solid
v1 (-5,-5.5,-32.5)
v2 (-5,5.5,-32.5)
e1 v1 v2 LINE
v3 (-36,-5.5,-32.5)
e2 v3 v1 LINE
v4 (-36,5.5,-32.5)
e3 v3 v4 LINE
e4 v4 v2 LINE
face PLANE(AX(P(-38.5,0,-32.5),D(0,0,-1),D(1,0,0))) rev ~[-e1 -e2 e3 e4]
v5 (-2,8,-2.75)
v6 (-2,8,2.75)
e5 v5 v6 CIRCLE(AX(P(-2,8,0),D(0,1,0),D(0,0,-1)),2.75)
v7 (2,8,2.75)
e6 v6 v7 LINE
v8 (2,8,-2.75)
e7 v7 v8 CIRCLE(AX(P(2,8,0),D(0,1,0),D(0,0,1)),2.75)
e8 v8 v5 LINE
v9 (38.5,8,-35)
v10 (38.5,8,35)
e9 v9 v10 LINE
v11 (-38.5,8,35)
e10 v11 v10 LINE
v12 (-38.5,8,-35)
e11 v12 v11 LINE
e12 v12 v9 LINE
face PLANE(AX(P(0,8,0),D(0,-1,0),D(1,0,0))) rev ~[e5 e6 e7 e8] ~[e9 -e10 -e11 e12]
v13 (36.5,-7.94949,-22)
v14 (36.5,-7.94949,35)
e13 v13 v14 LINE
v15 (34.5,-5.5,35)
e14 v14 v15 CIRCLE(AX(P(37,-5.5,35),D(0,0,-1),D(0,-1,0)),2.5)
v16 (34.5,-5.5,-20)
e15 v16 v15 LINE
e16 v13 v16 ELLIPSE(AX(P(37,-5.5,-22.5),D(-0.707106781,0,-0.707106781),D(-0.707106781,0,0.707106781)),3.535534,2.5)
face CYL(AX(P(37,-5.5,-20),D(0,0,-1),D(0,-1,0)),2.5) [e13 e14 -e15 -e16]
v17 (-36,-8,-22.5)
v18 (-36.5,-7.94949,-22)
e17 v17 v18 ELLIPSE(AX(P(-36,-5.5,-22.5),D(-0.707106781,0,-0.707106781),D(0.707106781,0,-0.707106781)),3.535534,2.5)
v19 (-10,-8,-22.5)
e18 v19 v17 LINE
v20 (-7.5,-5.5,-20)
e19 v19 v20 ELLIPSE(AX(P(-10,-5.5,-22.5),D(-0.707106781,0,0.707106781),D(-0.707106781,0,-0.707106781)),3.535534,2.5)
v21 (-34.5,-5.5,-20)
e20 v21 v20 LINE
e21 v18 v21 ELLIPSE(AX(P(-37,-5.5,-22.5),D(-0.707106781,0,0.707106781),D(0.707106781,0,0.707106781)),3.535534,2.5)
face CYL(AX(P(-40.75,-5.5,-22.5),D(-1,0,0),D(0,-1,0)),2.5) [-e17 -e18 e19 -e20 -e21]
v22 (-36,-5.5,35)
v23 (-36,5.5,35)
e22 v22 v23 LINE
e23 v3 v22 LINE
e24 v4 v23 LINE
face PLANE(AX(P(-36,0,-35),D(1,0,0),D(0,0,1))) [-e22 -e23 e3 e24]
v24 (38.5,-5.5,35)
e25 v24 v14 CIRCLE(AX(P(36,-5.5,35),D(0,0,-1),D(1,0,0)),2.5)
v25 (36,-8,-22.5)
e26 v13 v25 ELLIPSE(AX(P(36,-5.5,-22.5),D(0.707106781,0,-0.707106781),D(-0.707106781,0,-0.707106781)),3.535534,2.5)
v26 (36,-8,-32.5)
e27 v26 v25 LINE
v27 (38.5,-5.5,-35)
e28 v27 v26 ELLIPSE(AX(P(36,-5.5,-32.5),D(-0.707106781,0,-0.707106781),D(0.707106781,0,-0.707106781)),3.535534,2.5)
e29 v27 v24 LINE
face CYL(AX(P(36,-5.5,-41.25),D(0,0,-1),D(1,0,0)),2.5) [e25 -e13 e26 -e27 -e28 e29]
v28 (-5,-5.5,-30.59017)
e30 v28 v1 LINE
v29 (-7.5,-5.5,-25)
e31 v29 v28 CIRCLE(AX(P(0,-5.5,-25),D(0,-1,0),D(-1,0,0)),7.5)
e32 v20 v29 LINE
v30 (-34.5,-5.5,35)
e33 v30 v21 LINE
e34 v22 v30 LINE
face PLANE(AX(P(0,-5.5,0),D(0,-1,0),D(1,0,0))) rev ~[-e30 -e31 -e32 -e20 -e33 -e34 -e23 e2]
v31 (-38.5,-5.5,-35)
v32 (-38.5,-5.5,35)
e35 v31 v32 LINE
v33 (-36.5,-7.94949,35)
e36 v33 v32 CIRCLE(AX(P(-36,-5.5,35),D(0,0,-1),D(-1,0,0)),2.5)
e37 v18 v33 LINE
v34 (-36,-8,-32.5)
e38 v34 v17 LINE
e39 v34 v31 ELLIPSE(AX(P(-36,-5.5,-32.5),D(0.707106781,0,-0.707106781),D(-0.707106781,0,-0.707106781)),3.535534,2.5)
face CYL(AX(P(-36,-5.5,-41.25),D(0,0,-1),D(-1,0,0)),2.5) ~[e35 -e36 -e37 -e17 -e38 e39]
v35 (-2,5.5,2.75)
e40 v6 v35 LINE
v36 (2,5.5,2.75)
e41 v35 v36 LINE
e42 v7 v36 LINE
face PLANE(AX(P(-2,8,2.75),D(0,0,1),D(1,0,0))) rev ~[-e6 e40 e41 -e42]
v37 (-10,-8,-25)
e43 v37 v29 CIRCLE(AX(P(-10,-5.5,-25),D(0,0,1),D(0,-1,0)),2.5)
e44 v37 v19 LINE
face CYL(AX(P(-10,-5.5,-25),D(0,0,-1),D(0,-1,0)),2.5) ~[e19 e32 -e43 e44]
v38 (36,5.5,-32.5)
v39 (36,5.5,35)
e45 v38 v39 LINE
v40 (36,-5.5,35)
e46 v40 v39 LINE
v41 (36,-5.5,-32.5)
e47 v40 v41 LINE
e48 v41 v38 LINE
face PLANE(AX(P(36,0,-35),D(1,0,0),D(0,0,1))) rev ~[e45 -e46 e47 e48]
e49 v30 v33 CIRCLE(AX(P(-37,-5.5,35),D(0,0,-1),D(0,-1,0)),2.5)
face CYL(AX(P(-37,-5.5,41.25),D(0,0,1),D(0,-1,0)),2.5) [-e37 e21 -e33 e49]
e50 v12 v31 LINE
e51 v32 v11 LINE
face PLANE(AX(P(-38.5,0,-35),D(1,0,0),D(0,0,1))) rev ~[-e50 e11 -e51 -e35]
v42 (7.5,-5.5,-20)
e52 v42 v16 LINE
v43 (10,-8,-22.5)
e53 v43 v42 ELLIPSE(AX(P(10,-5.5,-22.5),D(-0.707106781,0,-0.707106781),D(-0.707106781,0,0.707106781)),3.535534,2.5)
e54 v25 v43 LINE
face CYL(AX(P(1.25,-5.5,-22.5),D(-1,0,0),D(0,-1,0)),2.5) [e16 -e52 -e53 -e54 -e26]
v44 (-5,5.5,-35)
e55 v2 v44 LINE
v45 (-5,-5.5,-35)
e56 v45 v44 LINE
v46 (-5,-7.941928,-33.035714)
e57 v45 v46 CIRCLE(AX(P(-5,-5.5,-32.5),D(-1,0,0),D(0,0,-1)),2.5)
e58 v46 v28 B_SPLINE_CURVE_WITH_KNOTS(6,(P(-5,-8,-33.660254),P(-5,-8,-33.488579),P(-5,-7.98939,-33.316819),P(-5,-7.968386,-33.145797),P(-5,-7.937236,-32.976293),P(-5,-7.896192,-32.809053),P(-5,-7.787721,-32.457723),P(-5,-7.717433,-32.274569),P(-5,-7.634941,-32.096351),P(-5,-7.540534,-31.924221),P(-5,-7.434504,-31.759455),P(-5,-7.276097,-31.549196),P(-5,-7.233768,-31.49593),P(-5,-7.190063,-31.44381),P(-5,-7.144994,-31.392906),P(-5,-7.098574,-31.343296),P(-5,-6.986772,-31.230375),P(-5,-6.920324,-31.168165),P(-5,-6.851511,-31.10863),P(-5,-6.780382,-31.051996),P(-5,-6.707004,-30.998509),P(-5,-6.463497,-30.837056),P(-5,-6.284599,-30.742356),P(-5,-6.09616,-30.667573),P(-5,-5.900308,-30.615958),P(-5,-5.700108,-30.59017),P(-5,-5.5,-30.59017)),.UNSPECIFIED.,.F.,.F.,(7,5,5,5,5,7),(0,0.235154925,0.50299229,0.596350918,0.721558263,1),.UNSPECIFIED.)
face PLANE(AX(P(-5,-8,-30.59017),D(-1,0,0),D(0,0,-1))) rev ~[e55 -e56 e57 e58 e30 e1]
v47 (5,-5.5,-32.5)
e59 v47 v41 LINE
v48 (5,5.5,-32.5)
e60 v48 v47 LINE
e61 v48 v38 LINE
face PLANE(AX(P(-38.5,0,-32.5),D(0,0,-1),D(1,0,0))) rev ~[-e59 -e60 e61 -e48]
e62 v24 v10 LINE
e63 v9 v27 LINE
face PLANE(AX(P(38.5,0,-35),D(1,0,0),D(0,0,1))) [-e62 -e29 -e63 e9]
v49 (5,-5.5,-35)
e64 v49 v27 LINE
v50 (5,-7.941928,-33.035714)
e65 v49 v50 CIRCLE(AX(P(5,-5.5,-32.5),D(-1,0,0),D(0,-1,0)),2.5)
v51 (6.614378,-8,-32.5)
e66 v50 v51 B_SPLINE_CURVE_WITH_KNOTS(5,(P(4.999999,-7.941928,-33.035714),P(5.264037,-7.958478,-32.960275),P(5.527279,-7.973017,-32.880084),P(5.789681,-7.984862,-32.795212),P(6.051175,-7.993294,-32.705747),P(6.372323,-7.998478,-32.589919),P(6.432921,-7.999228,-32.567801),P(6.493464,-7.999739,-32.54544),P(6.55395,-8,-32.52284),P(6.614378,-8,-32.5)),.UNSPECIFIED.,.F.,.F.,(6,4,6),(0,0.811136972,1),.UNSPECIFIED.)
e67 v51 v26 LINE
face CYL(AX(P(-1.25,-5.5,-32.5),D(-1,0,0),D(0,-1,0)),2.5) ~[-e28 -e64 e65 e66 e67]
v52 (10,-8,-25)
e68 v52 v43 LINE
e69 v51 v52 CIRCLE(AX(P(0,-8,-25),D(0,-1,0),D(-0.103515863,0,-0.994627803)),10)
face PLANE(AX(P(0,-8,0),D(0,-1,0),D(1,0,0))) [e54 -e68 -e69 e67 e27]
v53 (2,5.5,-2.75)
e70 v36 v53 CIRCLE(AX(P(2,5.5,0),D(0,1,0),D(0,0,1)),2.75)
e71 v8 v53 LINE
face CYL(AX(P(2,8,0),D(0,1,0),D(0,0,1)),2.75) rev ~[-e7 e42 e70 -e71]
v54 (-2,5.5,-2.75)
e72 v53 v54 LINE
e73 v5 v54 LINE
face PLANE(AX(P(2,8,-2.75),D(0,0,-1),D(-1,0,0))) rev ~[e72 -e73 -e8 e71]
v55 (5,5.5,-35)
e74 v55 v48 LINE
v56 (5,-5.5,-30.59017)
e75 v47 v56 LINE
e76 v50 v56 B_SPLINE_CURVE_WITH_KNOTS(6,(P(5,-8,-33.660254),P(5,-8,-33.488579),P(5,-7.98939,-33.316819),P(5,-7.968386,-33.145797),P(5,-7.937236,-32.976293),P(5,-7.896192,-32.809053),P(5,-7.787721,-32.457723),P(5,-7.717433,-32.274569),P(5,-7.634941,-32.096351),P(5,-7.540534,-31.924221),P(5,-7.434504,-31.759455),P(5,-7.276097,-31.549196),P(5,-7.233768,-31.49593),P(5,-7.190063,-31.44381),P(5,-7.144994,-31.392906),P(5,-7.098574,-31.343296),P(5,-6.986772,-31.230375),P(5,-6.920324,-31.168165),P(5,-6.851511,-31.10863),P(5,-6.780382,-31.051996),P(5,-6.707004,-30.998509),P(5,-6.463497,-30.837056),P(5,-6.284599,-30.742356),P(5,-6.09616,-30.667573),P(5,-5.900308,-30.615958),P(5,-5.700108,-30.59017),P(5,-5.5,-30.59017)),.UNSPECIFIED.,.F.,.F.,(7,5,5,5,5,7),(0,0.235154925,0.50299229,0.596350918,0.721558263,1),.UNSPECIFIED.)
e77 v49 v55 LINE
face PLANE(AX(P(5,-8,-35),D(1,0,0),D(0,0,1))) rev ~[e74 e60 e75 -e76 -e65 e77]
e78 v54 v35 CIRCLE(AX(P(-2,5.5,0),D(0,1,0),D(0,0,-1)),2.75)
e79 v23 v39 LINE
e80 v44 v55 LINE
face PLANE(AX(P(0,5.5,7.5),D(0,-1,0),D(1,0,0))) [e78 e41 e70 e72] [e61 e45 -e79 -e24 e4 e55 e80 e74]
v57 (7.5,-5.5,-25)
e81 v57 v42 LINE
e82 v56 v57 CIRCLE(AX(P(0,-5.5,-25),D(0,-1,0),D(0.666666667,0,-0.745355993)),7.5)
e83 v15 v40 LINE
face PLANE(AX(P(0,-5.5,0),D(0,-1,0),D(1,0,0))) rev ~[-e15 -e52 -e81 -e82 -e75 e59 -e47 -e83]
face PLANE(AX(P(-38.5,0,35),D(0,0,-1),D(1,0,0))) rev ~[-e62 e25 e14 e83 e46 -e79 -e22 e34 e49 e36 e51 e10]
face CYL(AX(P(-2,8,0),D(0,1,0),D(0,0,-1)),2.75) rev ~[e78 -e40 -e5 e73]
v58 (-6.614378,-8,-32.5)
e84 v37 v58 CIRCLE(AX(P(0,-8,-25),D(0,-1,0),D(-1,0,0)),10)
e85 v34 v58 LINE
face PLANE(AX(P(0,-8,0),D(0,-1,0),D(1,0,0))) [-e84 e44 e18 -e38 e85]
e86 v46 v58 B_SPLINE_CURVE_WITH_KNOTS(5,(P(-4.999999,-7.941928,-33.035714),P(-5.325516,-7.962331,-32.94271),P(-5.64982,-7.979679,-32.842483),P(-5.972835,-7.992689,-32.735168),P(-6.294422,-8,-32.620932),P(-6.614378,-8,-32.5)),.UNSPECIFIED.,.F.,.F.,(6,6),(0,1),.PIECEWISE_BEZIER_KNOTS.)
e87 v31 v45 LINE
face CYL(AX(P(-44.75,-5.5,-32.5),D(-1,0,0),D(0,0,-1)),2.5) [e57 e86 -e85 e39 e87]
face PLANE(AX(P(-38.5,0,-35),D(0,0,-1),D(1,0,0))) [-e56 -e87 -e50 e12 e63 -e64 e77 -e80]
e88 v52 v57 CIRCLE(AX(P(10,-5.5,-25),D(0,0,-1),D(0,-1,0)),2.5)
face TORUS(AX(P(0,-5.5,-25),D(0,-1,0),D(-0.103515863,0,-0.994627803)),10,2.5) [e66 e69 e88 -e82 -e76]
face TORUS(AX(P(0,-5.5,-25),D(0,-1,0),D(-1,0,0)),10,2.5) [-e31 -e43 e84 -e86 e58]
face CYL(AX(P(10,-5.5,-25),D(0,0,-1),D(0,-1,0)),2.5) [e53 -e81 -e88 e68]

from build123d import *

# Parameters (mm, degrees)
F0_W         = 77
F0_H         = 70
F1_DEPTH     = 8
F2_T         = -2.5
F4_DEPTH     = 13.5
F6_DEPTH     = 2.5
F7_T1_DEPTH  = 82.5
F7_T3_DEPTH  = 46
F7_T5_DEPTH  = 46
F7_T7_DEPTH  = 33.25
F7_T9_DEPTH  = 33.25
F7_T11_DEPTH = 61.25
F7_T13_DEPTH = 11.25
F7_T16_ANGLE = 95.9416658211
F7_T18_ANGLE = 95.9416658211
F7_T23_DEPTH = 39.5
F7_T27_DEPTH = 67.5
F7_T34_DEPTH = 67.5
F7_T38_DEPTH = 39.5


# Not quite as in the source:
# - a fillet or chamfer that OpenCascade refuses, or shapes differently, is made with other operations: its cross-section is extruded or revolved along the edge and cut away or added


with BuildPart() as f1:
    # F0 (on Front) → F1 (new body, symmetric)
    with BuildSketch(Plane.XZ):
        Rectangle(F0_W, F0_H)
    extrude(amount=F1_DEPTH, both=True)

    # F2
    f2_openings = [f1.faces().sort_by_distance(p)[0] for p in [
        (0, 0, 35),
    ]]
    offset(amount=F2_T, openings=f2_openings)

    # F3 (on face) → F4 (cut, through all)
    with BuildSketch(Plane.XZ.offset(8)):
        Polygon((34.5, 35), (-34.5, 35), (-34.5, -20), (-7.5, -20), (7.5, -20), (34.5, -20), align=None)
        with BuildLine():
            Line((7.5, -20), (-7.5, -20))
            Line((-7.5, -20), (-7.5, -25))
            ThreePointArc((-7.5, -25), (-6.8465319688, -28.0618621785), (-5, -30.5901699437))
            ThreePointArc((-5, -30.5901699437), (0, -32.5), (5, -30.5901699437))
            ThreePointArc((5, -30.5901699437), (6.8465319688, -28.0618621785), (7.5, -25))
            Line((7.5, -25), (7.5, -20))
        make_face()
        with BuildLine():
            Line((-5, -30.5901699437), (-5, -35))
            Line((-5, -35), (5, -35))
            Line((5, -35), (5, -30.5901699437))
            ThreePointArc((5, -30.5901699437), (0, -32.5), (-5, -30.5901699437))
        make_face()
    extrude(amount=-F4_DEPTH, mode=Mode.SUBTRACT)

    # F5 (on face) → F6 (cut, through all)
    with BuildSketch(Plane(origin=(0, 8, 0), x_dir=(-1, 0, 0), z_dir=(0, 1, 0))):
        with BuildLine():
            ThreePointArc((2, -2.75), (4.75, 0), (2, 2.75))
            Line((2, 2.75), (-2, 2.75))
            ThreePointArc((-2, 2.75), (-4.75, 0), (-2, -2.75))
            Line((-2, -2.75), (2, -2.75))
        make_face()
    extrude(amount=-F6_DEPTH, mode=Mode.SUBTRACT)

    # F7: fillet of radius 2.5 on 10 edges, made by hand

    # F7_s2 → F7_t1 (cut)
    with BuildSketch(Plane.XY.offset(-41.25)):
        with BuildLine():
            ThreePointArc((38.5, -5.5), (37.767766953, -7.267766953), (36, -8))
            Line((36, -8), (38.5, -8))
            Line((38.5, -8), (38.5, -5.5))
        make_face()
        with BuildLine():
            ThreePointArc((-38.5, -5.5), (-37.767766953, -7.267766953), (-36, -8))
            Line((-36, -8), (-38.5, -8))
            Line((-38.5, -8), (-38.5, -5.5))
        make_face()
    extrude(amount=F7_T1_DEPTH, mode=Mode.SUBTRACT)

    # F7_s4 → F7_t3 (cut)
    with BuildSketch(Plane.YZ.offset(-44.75)):
        with BuildLine():
            ThreePointArc((-5.5, -35), (-7.267766953, -34.267766953), (-8, -32.5))
            Line((-8, -32.5), (-8, -35))
            Line((-8, -35), (-5.5, -35))
        make_face()
    extrude(amount=F7_T3_DEPTH, mode=Mode.SUBTRACT)

    # F7_s6 → F7_t5 (cut)
    with BuildSketch(Plane.YZ.offset(-1.25)):
        with BuildLine():
            ThreePointArc((-8, -32.5), (-7.267766953, -34.267766953), (-5.5, -35))
            Line((-5.5, -35), (-8, -35))
            Line((-8, -35), (-8, -32.5))
        make_face()
    extrude(amount=F7_T5_DEPTH, mode=Mode.SUBTRACT)

    # F7_s8 → F7_t7 (cut)
    with BuildSketch(Plane.YZ.offset(1.25)):
        with BuildLine():
            ThreePointArc((-8, -22.5), (-7.267766953, -20.732233047), (-5.5, -20))
            Line((-5.5, -20), (-8, -20))
            Line((-8, -20), (-8, -22.5))
        make_face()
    extrude(amount=F7_T7_DEPTH, mode=Mode.SUBTRACT)

    # F7_s10 → F7_t9 (cut)
    with BuildSketch(Plane.YZ.offset(-34.5)):
        with BuildLine():
            ThreePointArc((-8, -22.5), (-7.267766953, -20.732233047), (-5.5, -20))
            Line((-5.5, -20), (-8, -20))
            Line((-8, -20), (-8, -22.5))
        make_face()
    extrude(amount=F7_T9_DEPTH, mode=Mode.SUBTRACT)

    # F7_s12 → F7_t11 (cut)
    with BuildSketch(Plane.XY.offset(-20)):
        with BuildLine():
            ThreePointArc((37, -8), (35.232233047, -7.267766953), (34.5, -5.5))
            Line((34.5, -5.5), (34.5, -8))
            Line((34.5, -8), (37, -8))
        make_face()
        with BuildLine():
            ThreePointArc((-37, -8), (-35.232233047, -7.267766953), (-34.5, -5.5))
            Line((-34.5, -5.5), (-34.5, -8))
            Line((-34.5, -8), (-37, -8))
        make_face()
    extrude(amount=F7_T11_DEPTH, mode=Mode.SUBTRACT)

    # F7_s14 → F7_t13 (cut)
    with BuildSketch(Plane.XY.offset(-25)):
        with BuildLine():
            ThreePointArc((10, -8), (8.232233047, -7.267766953), (7.5, -5.5))
            Line((7.5, -5.5), (7.5, -8))
            Line((7.5, -8), (10, -8))
        make_face()
        with BuildLine():
            ThreePointArc((-10, -8), (-8.232233047, -7.267766953), (-7.5, -5.5))
            Line((-7.5, -5.5), (-7.5, -8))
            Line((-7.5, -8), (-10, -8))
        make_face()
    extrude(amount=F7_T13_DEPTH, mode=Mode.SUBTRACT)

    # F7_s15 → F7_t16 (revolve, cut)
    with BuildSketch(Plane.XY.offset(-25)):
        with BuildLine():
            ThreePointArc((-10, -8), (-8.232233047, -7.267766953), (-7.5, -5.5))
            Line((-7.5, -5.5), (-7.5, -8))
            Line((-7.5, -8), (-10, -8))
        make_face()
    revolve(axis=Axis((0, -8, -25), (0, -1, 0)), revolution_arc=F7_T16_ANGLE, mode=Mode.SUBTRACT)

    # F7_s17 → F7_t18 (revolve, cut)
    with BuildSketch(Plane(origin=(2.5739938884, 0, -0.2678883482), x_dir=(0, 1, 0), z_dir=(-0.9946278028, 0, 0.1035158632))):
        with BuildLine():
            ThreePointArc((-8, 34.8656950696), (-7.267766953, 33.0979281167), (-5.5, 32.3656950696))
            Line((-5.5, 32.3656950696), (-8, 32.3656950696))
            Line((-8, 32.3656950696), (-8, 34.8656950696))
        make_face()
    revolve(axis=Axis((0, -8, -25), (0, -1, 0)), revolution_arc=F7_T18_ANGLE, mode=Mode.SUBTRACT)


with BuildPart() as f7_tool21:
    # F7_s22 → F7_t23 (new body)
    with BuildSketch(Plane.YZ.offset(1.25)):
        with BuildLine():
            ThreePointArc((-8, -22.5), (-7.267766953, -20.732233047), (-5.5, -20))
            Line((-5.5, -20), (-8, -20))
            Line((-8, -20), (-8, -22.5))
        make_face()
    extrude(amount=F7_T23_DEPTH)

    split(bisect_by=Plane.YZ.offset(34.5), keep=Keep.TOP)


with BuildPart() as f7_tool25:
    # F7_s26 → F7_t27 (new body)
    with BuildSketch(Plane.XY.offset(-26.25)):
        with BuildLine():
            ThreePointArc((37, -8), (35.232233047, -7.267766953), (34.5, -5.5))
            Line((34.5, -5.5), (34.5, -8))
            Line((34.5, -8), (37, -8))
        make_face()
    extrude(amount=F7_T27_DEPTH)

    split(bisect_by=Plane.XY.offset(-20), keep=Keep.BOTTOM)


with BuildPart() as f7_tool21_1:
    add(f7_tool21.part)

    # F7_t29: intersect F7_tool25
    add(f7_tool25.part, mode=Mode.INTERSECT)


with BuildPart() as f1_1:
    add(f1.part)

    # F7_t19: cut F7_tool21
    add(f7_tool21_1.part, mode=Mode.SUBTRACT)


with BuildPart() as f7_tool32:
    # F7_s33 → F7_t34 (new body)
    with BuildSketch(Plane.XY.offset(41.25)):
        with BuildLine():
            ThreePointArc((-37, -8), (-35.232233047, -7.267766953), (-34.5, -5.5))
            Line((-34.5, -5.5), (-34.5, -8))
            Line((-34.5, -8), (-37, -8))
        make_face()
    extrude(amount=-F7_T34_DEPTH)

    split(bisect_by=Plane.XY.offset(-20), keep=Keep.BOTTOM)


with BuildPart() as f7_tool36:
    # F7_s37 → F7_t38 (new body)
    with BuildSketch(Plane.YZ.offset(-40.75)):
        with BuildLine():
            ThreePointArc((-8, -22.5), (-7.267766953, -20.732233047), (-5.5, -20))
            Line((-5.5, -20), (-8, -20))
            Line((-8, -20), (-8, -22.5))
        make_face()
    extrude(amount=F7_T38_DEPTH)

    split(bisect_by=Plane.YZ.offset(-34.5), keep=Keep.BOTTOM)


with BuildPart() as f7_tool32_1:
    add(f7_tool32.part)

    # F7_t40: intersect F7_tool36
    add(f7_tool36.part, mode=Mode.INTERSECT)


with BuildPart() as f1_2:
    add(f1_1.part)

    # F7_t30: cut F7_tool32
    add(f7_tool32_1.part, mode=Mode.SUBTRACT)


solid = f1_2.part
